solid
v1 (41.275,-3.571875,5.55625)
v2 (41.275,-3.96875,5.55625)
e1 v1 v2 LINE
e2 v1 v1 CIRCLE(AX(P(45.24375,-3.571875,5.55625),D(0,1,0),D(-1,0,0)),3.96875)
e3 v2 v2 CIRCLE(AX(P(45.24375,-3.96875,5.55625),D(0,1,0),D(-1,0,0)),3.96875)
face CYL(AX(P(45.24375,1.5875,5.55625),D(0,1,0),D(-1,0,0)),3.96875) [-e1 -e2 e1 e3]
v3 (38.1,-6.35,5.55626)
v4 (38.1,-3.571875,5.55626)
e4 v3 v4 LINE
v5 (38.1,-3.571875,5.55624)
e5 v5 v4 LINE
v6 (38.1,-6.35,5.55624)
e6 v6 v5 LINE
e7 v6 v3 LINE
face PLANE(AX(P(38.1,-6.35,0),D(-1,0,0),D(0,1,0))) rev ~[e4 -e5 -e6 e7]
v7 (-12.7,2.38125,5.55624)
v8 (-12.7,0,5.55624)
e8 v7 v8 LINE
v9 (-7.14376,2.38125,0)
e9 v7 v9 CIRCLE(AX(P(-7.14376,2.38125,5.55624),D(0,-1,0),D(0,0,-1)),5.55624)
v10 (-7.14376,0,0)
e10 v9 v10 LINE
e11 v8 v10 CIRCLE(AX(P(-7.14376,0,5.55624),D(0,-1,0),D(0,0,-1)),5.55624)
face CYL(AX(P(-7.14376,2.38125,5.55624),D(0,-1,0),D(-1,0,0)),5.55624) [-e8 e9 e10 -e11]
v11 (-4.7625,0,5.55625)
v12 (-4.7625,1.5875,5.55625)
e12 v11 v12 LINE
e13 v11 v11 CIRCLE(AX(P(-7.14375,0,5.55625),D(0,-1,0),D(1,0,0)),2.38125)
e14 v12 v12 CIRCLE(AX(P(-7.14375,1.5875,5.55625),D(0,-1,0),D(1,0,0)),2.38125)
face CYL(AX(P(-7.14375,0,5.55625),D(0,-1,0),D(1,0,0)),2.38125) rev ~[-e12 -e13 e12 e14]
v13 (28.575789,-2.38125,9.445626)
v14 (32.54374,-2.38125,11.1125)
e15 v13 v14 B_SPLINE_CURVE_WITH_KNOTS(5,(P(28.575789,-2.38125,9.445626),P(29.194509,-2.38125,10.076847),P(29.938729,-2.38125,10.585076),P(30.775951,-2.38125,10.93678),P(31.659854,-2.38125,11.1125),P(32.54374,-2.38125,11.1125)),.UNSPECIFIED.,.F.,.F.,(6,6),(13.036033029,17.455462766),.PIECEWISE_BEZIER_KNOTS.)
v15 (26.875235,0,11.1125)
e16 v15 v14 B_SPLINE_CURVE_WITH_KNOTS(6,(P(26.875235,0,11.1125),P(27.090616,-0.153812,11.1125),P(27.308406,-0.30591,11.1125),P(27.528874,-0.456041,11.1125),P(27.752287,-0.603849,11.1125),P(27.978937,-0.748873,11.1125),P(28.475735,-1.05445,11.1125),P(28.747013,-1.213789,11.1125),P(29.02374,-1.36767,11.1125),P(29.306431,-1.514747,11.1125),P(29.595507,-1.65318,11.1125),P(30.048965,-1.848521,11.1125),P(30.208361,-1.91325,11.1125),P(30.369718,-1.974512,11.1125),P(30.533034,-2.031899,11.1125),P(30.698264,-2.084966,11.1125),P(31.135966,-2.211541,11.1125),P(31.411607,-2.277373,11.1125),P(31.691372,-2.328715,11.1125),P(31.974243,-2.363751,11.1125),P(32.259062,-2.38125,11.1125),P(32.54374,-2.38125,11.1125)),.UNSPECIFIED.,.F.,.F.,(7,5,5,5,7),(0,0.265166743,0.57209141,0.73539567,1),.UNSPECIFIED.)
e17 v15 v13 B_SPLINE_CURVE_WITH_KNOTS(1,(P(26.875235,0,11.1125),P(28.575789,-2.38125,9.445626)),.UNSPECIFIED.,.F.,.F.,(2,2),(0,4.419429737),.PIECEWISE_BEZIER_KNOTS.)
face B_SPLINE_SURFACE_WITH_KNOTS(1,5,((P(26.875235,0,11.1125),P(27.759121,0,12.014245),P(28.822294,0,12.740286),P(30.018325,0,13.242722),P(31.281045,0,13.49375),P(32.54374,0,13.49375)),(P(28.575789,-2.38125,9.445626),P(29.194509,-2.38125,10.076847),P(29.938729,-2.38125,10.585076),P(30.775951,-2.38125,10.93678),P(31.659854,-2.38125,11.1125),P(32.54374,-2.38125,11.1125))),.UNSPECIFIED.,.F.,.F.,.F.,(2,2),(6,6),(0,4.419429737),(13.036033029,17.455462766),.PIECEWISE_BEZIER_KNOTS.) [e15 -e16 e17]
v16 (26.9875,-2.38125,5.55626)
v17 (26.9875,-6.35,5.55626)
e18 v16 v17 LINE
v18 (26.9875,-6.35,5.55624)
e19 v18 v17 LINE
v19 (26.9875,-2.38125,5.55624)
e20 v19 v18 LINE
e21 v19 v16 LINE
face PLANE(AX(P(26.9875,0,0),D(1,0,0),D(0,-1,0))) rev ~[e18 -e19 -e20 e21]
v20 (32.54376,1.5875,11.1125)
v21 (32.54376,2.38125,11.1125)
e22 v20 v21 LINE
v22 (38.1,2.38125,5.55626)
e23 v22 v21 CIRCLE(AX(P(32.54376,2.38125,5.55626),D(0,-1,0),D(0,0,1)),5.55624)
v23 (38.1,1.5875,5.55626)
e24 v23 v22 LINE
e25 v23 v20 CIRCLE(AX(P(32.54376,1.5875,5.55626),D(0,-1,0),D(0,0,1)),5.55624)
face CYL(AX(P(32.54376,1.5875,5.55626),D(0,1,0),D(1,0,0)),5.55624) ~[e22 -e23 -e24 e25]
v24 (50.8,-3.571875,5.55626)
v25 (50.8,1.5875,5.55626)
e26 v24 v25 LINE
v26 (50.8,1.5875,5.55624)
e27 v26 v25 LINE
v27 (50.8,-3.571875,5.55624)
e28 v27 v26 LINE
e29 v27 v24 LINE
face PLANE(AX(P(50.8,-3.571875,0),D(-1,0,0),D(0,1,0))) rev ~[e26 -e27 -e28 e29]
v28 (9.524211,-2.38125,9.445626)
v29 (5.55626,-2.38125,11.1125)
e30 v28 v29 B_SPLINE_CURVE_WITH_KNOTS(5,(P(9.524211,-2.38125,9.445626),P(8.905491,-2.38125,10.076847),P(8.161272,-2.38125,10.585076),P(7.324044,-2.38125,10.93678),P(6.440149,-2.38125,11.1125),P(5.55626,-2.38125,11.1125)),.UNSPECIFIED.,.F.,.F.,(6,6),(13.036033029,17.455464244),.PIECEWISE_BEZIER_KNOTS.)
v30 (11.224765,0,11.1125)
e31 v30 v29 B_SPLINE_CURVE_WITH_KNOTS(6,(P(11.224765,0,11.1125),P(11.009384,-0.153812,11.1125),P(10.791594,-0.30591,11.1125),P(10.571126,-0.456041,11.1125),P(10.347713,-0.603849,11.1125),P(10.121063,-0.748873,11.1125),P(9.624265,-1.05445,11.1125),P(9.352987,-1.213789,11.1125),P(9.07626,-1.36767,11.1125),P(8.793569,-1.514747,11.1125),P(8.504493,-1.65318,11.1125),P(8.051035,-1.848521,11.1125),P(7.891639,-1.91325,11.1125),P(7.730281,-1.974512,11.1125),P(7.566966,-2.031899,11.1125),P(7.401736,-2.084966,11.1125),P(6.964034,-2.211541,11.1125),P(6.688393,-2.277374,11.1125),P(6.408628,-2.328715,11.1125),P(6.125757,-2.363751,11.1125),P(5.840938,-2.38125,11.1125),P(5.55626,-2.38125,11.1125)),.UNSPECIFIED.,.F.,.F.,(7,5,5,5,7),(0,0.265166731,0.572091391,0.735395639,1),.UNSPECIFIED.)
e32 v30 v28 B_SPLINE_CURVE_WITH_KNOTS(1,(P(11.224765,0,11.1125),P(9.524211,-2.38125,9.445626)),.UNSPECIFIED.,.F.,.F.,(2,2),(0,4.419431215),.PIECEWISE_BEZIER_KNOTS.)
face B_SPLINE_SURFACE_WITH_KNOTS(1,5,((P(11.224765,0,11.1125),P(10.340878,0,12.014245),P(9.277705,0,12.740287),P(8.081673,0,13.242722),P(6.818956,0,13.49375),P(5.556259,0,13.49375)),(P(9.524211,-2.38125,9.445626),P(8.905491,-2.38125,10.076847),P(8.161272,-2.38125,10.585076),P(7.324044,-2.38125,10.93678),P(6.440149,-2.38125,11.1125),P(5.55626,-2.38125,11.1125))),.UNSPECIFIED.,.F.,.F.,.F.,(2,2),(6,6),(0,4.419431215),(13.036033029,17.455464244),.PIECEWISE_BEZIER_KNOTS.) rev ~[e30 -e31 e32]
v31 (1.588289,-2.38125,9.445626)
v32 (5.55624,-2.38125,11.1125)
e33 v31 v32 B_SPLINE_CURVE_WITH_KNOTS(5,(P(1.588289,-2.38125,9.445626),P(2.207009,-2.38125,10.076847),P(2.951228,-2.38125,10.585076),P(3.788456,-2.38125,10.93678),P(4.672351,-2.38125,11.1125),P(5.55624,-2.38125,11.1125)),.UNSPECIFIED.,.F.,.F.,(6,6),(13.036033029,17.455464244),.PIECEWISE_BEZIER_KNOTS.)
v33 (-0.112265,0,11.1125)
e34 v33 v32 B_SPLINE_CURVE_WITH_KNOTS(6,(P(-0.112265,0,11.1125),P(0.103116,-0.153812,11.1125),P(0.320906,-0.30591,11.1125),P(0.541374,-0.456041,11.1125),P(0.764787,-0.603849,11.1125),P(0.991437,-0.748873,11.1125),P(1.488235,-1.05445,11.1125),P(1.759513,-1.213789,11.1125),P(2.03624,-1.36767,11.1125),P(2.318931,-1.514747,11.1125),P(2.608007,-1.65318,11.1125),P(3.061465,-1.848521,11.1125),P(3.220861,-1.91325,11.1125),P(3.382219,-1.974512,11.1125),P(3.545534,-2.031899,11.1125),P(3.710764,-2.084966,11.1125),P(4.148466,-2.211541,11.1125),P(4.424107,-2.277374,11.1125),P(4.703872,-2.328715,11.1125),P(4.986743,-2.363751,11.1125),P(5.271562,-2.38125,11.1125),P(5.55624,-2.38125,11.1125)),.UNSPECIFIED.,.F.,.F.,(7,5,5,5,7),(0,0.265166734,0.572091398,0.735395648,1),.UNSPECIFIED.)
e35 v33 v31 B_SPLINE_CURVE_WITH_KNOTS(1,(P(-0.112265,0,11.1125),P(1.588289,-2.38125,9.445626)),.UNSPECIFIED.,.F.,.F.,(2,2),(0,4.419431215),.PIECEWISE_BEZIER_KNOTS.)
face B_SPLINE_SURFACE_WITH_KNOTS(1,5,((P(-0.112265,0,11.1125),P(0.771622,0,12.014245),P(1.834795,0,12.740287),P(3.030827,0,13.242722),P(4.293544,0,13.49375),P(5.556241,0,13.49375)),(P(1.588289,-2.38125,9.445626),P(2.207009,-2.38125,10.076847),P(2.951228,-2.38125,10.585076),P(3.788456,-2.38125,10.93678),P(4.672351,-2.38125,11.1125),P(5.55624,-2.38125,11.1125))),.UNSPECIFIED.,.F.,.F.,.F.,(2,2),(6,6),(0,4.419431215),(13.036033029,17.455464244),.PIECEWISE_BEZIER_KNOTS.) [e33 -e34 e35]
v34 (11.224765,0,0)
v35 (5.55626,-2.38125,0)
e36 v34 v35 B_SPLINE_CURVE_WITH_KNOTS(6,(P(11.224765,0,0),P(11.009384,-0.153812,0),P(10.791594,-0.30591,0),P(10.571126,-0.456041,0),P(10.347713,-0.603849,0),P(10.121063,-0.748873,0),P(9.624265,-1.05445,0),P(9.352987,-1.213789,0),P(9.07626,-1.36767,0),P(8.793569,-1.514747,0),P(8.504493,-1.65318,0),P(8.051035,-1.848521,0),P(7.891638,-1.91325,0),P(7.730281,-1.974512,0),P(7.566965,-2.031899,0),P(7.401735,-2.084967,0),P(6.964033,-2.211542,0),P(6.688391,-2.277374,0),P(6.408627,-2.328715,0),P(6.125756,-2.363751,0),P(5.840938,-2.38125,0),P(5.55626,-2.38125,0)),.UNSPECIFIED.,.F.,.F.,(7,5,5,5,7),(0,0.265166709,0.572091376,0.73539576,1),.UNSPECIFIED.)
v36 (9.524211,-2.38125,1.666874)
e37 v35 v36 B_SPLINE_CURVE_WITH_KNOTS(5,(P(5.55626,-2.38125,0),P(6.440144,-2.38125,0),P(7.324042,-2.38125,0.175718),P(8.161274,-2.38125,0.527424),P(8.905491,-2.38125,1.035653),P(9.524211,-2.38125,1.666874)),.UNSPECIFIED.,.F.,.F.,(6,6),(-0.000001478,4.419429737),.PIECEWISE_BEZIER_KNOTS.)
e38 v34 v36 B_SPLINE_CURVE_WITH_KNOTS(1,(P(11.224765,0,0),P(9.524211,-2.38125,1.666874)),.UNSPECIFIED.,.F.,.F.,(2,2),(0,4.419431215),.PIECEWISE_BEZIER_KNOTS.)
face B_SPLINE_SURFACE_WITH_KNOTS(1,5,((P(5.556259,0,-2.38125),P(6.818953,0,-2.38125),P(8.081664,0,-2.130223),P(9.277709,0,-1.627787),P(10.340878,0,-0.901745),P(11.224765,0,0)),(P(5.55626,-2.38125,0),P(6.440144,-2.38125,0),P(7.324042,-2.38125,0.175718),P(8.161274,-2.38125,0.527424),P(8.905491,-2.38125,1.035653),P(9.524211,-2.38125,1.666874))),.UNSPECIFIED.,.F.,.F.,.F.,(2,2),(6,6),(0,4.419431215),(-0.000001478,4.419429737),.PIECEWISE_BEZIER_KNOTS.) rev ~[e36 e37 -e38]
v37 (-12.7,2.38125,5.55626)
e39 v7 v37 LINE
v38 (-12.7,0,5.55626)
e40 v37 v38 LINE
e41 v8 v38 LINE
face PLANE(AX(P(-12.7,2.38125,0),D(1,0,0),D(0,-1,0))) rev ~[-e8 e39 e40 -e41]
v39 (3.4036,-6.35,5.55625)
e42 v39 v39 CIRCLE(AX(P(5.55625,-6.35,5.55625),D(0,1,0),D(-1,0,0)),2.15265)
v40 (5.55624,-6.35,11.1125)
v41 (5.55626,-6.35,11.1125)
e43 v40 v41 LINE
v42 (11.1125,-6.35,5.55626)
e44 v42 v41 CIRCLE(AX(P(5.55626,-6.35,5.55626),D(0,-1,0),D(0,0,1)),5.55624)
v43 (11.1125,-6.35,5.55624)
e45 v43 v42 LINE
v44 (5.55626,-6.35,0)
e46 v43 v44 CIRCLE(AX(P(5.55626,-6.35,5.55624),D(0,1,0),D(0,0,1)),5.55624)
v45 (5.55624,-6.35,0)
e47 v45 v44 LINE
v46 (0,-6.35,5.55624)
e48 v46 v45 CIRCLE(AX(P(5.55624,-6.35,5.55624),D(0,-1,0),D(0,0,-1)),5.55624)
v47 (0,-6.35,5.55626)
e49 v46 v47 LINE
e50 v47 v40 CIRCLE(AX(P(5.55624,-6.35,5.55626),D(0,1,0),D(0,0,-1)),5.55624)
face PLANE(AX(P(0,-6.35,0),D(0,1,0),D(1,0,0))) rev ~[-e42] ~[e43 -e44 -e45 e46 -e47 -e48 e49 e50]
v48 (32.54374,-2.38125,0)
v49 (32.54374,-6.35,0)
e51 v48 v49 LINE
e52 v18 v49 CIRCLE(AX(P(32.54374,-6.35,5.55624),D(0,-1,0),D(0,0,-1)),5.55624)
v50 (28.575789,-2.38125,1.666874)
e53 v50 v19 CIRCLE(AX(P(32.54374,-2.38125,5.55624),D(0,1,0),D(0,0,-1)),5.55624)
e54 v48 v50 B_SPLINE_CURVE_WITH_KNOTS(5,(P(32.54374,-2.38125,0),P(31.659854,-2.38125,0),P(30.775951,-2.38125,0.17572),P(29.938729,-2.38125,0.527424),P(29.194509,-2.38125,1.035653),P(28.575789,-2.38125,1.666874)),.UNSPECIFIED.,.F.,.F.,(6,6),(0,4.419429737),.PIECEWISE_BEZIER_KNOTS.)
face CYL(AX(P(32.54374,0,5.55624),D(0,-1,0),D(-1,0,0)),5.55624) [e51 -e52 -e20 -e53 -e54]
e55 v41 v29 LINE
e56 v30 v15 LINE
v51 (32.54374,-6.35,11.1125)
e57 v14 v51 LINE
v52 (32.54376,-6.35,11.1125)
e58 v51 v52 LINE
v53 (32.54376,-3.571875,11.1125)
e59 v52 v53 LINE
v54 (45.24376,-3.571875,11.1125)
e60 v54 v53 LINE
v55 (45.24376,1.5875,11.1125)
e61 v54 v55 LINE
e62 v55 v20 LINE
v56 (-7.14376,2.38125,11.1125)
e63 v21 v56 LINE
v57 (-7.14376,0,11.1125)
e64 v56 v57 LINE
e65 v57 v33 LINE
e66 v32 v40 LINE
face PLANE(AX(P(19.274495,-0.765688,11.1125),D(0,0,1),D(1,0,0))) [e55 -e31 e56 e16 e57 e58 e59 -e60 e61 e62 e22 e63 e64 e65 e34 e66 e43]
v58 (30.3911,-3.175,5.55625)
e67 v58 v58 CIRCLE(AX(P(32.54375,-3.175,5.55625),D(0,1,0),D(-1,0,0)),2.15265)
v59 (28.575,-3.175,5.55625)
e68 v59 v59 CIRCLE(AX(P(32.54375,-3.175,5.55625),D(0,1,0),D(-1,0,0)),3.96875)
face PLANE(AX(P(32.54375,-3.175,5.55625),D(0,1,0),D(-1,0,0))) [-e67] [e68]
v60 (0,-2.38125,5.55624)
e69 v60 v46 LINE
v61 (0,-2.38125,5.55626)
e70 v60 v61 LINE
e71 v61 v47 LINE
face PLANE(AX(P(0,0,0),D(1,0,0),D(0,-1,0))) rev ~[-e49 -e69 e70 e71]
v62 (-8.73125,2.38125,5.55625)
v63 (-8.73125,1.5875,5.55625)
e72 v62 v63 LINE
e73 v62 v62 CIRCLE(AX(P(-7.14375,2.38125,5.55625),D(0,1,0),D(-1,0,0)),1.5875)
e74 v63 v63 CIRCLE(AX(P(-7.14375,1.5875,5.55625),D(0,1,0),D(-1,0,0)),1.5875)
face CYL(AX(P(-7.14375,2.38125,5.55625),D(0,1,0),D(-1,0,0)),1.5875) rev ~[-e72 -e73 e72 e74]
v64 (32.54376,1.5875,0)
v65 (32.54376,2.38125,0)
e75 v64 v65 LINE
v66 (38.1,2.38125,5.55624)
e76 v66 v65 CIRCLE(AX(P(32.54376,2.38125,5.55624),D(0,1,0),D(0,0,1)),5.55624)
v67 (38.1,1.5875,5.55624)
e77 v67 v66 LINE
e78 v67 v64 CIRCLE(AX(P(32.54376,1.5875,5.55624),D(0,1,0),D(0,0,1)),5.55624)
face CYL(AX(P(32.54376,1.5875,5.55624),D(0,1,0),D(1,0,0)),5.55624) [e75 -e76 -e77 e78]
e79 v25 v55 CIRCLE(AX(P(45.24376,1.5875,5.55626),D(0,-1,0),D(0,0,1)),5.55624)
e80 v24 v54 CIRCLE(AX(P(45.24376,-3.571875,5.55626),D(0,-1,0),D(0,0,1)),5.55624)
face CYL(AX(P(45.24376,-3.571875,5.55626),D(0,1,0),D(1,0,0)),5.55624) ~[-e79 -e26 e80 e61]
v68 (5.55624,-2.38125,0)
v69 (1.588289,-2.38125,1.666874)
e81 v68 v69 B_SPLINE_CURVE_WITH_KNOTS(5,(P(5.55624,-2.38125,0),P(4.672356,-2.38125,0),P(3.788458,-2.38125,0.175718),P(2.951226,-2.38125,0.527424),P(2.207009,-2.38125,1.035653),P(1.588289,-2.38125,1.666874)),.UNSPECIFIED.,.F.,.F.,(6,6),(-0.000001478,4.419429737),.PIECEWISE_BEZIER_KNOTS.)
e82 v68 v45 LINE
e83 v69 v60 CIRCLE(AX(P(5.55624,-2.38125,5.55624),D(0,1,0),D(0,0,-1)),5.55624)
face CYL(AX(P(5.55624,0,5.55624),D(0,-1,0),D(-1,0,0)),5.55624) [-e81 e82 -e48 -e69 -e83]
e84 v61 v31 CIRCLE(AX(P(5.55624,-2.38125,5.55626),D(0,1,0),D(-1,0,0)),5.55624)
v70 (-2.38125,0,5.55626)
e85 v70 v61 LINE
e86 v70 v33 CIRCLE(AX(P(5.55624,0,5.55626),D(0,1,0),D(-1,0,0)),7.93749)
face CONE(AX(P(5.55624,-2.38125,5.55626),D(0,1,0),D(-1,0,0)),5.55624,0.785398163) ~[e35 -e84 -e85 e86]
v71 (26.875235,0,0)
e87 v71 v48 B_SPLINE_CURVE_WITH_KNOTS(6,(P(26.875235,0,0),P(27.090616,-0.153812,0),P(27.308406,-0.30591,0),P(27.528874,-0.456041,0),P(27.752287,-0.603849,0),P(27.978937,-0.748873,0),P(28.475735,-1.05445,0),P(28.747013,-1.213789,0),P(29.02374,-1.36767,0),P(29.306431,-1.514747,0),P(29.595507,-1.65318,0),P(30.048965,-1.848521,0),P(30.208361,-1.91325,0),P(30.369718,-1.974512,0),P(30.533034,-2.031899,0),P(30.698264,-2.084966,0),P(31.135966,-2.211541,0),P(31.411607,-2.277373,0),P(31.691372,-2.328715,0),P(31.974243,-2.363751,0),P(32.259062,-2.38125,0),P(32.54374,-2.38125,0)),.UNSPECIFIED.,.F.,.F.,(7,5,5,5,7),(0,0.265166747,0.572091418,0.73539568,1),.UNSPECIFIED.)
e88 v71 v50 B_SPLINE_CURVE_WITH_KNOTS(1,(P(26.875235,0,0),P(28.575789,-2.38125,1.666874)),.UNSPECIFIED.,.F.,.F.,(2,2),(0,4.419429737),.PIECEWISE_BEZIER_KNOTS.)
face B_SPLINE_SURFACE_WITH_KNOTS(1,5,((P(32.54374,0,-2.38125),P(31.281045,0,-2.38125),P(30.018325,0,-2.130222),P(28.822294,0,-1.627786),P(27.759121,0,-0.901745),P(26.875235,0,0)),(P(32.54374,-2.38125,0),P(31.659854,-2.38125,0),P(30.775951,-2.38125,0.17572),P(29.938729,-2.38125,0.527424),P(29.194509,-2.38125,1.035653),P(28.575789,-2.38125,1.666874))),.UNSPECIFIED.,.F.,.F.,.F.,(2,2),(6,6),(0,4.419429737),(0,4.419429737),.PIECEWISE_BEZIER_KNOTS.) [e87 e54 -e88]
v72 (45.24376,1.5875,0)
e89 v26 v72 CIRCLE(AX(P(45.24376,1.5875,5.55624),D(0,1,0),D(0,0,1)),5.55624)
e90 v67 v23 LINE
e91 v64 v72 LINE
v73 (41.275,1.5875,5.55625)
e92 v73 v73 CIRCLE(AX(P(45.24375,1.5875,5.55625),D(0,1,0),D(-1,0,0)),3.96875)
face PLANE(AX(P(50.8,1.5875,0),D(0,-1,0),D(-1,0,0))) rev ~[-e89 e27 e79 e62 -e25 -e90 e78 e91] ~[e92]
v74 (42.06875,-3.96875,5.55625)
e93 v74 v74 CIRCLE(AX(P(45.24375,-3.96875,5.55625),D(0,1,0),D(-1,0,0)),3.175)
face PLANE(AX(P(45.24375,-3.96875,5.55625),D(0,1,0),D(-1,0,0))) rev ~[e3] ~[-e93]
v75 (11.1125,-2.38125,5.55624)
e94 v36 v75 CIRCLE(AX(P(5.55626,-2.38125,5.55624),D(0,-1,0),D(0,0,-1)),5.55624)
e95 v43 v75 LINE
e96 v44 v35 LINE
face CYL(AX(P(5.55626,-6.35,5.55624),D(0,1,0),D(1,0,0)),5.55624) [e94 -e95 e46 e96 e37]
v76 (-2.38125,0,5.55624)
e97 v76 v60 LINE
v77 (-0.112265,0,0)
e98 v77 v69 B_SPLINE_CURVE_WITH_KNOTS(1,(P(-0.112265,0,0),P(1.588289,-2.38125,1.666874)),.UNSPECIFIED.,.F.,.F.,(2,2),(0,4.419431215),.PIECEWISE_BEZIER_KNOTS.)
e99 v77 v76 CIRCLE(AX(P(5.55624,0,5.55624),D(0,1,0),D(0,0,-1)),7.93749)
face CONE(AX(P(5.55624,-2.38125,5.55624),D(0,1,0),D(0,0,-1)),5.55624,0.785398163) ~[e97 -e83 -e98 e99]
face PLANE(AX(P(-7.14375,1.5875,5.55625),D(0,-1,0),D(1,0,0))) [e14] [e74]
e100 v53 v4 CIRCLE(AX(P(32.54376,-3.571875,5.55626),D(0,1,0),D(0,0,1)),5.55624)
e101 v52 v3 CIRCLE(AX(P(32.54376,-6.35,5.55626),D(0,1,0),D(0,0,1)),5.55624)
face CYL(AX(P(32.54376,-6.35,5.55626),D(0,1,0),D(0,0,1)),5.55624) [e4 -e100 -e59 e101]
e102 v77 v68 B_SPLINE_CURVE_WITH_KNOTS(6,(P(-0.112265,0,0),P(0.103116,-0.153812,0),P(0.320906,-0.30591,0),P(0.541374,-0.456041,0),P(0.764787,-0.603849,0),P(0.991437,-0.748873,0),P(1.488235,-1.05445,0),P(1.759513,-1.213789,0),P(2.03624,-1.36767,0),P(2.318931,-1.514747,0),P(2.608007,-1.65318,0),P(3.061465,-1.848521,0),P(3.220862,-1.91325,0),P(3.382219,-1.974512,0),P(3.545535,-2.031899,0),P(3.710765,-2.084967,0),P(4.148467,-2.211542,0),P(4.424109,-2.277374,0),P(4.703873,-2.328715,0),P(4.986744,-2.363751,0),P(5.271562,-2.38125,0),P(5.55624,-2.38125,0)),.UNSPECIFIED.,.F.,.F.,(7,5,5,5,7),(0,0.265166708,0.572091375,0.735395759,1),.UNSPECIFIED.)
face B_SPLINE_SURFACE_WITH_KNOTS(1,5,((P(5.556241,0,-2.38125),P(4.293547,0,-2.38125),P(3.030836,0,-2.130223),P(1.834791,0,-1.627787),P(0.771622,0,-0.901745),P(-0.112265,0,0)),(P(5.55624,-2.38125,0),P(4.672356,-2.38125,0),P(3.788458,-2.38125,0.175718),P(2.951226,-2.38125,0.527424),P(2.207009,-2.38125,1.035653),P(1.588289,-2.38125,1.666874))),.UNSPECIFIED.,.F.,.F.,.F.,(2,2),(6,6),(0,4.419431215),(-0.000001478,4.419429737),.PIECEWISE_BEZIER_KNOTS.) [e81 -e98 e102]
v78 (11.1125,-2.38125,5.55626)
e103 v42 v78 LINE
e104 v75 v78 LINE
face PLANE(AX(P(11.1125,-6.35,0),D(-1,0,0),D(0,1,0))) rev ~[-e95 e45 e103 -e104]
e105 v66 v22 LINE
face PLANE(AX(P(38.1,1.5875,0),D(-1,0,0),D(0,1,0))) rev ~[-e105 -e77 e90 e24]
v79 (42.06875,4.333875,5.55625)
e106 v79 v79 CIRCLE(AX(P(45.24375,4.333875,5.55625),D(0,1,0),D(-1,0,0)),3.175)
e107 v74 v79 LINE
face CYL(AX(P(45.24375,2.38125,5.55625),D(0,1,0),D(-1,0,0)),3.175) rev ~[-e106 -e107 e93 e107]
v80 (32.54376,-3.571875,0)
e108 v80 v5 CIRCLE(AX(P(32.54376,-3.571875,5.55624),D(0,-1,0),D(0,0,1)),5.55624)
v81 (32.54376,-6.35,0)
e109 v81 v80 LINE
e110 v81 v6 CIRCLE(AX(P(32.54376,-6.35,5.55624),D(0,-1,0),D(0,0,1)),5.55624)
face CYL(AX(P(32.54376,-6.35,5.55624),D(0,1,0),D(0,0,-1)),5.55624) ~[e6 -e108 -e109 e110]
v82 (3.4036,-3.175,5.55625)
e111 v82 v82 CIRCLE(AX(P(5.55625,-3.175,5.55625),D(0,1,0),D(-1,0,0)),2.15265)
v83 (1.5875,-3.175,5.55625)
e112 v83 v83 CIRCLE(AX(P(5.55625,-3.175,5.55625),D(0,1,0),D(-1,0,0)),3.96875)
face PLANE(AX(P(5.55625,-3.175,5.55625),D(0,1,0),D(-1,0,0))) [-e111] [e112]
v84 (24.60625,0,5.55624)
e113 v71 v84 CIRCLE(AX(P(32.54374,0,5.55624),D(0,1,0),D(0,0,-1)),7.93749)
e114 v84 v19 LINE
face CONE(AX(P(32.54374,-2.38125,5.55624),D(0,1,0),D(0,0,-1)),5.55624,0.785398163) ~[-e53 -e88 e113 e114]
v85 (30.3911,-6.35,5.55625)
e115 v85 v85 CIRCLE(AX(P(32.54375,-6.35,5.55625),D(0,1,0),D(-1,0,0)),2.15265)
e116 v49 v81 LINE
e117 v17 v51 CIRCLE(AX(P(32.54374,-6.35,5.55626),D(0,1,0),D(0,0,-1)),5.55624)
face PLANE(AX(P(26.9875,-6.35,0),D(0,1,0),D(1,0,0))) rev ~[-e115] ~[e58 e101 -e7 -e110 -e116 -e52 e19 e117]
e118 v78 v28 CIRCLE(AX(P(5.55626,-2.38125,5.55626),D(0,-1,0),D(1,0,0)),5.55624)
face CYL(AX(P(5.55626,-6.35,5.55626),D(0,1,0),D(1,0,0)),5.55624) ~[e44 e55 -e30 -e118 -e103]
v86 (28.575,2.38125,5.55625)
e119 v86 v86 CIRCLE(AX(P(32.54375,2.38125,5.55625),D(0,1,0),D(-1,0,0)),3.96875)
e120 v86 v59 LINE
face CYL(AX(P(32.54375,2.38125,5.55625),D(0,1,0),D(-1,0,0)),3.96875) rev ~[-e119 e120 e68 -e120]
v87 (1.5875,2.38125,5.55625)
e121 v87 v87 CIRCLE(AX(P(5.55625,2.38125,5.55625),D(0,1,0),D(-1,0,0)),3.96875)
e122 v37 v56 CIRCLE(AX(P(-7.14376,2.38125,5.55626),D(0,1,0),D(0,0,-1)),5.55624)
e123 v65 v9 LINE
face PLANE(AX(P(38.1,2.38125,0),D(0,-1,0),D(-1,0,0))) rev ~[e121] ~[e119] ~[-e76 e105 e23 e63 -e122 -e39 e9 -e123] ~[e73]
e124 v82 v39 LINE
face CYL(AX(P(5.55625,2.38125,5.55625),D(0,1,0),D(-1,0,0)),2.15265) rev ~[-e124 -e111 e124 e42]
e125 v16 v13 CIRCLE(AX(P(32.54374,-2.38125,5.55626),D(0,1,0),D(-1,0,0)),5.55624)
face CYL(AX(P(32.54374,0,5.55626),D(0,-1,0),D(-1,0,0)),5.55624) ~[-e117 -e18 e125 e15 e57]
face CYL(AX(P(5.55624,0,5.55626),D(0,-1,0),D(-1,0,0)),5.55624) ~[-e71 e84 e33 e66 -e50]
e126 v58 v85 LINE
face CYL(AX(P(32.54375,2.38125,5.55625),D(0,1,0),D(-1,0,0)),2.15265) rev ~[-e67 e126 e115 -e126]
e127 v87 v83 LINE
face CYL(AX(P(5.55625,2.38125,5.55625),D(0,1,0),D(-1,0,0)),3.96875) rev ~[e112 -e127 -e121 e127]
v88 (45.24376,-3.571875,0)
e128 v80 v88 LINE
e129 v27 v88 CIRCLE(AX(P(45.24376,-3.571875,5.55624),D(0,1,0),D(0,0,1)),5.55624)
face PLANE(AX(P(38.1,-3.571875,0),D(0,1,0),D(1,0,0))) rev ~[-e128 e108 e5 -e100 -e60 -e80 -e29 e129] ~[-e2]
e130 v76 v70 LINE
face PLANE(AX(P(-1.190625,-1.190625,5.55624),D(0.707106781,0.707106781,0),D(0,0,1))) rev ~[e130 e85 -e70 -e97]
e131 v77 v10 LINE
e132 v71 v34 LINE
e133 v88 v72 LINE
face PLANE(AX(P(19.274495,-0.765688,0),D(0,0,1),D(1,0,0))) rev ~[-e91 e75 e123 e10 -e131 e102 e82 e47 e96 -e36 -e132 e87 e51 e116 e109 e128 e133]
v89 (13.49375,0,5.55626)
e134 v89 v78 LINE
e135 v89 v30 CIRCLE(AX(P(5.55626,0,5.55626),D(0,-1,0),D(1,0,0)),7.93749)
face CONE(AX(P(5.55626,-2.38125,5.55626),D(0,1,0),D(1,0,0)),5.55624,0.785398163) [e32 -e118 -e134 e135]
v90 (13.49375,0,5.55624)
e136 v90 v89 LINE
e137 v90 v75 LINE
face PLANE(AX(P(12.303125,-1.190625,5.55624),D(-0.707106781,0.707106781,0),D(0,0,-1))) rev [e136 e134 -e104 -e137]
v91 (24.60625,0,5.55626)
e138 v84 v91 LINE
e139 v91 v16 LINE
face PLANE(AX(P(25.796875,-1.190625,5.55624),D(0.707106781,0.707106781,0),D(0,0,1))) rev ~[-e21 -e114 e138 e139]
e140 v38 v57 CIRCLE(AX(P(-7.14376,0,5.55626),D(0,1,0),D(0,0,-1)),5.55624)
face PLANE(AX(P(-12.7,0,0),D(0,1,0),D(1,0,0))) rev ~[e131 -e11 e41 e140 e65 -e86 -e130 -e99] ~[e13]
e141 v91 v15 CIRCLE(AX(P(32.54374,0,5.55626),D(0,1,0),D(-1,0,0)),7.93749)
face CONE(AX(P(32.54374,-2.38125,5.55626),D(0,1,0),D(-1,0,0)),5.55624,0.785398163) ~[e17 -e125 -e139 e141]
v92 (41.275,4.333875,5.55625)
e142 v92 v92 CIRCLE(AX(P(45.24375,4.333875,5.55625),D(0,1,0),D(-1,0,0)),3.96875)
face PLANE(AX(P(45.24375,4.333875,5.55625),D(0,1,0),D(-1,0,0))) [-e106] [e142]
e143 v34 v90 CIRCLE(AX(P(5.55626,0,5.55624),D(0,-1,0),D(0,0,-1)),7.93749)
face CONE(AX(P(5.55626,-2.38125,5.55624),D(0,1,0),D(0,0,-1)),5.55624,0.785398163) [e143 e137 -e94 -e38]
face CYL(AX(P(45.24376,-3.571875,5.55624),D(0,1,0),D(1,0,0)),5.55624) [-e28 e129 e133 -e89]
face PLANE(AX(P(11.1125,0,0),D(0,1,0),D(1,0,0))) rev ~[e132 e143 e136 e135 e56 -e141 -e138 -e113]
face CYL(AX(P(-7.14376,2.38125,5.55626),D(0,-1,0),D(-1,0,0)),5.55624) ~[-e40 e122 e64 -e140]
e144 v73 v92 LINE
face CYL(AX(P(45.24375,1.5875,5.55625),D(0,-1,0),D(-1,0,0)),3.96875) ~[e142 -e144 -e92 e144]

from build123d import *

# Parameters (mm, degrees)
F1_DEPTH      = 11.1125
F2_R          = 3.175
F2_R_2        = 1.5875
F2_R_3        = 2.15265
F3_DEPTH      = 8.73125
F4_R          = 2.38125
F5_DEPTH      = 1.5875
F6_R          = 3.96875
F6_R_2        = 3.175
F7_DEPTH      = 2.746375
F7_DEPTH_BACK = 5.55625
F8_R          = 5.55624
F10_R         = 3.96875
F11_DEPTH     = 5.55625
F12_C1_SIZE   = 2.38125
F12_C2_SIZE   = 2.38125
F12_C3_SIZE   = 2.38125


# Not quite as in the source:
# - a fillet or chamfer is up to 0.001 mm smaller than in the source, because OpenCascade refuses the exact size


with BuildPart() as f1:
    # F0 (on Top) → F1 (new body)
    with BuildSketch(Plane.XY):
        Polygon((-12.7, 0), (0, 0), (0, -6.35), (11.1125, -6.35), (11.1125, 0), (26.9875, 0), (26.9875, -6.35), (38.1, -6.35), (38.1, -3.571875), (50.8, -3.571875), (50.8, 1.5875), (38.1, 1.5875), (38.1, 2.38125), (-12.7, 2.38125), align=None)
    extrude(amount=F1_DEPTH)

    # F2 (on face) → F3 (cut, through all)
    with BuildSketch(Plane(origin=(0, 2.38125, 0), x_dir=(-1, 0, 0), z_dir=(0, 1, 0))):
        with Locations((-45.24375, 5.55625)):
            Circle(F2_R)
        with Locations((7.14375, 5.55625)):
            Circle(F2_R_2)
        with Locations((-5.55625, 5.55625)):
            Circle(F2_R_3)
        with Locations((-32.54375, 5.55625)):
            Circle(F2_R_3)
    extrude(amount=-F3_DEPTH, mode=Mode.SUBTRACT)

    # F4 (on face) → F5 (cut)
    with BuildSketch(Plane.XZ):
        with Locations((-7.14375, 5.55625)):
            Circle(F4_R)
    extrude(amount=-F5_DEPTH, mode=Mode.SUBTRACT)

    # F6 (on face) → F7 (join, two sides)
    with BuildSketch(Plane(origin=(0, 1.5875, 0), x_dir=(-1, 0, 0), z_dir=(0, 1, 0))) as f7_sk:
        with Locations((-45.24375, 5.55625)):
            Circle(F6_R)
        with Locations((-45.24375, 5.55625)):
            Circle(F6_R_2, mode=Mode.SUBTRACT)
    extrude(amount=F7_DEPTH)
    extrude(f7_sk.sketch, amount=-F7_DEPTH_BACK)

    # F8 (radius 5.55625 in the source; OpenCascade refuses exactly that, so slightly less here)
    f8_edges = [f1.edges().sort_by_distance(p)[0] for p in [
        (0, -3.175, 0),
        (0, -3.175, 11.1125),
        (38.1, -4.960938, 0),
        (38.1, -4.960938, 11.1125),
        (38.1, 1.984375, 0),
        (38.1, 1.984375, 11.1125),
        (11.1125, -3.175, 11.1125),
        (11.1125, -3.175, 0),
        (26.9875, -3.175, 11.1125),
        (26.9875, -3.175, 0),
        (50.8, -0.992188, 11.1125),
        (50.8, -0.992188, 0),
        (-12.7, 1.190625, 11.1125),
        (-12.7, 1.190625, 0),
    ]]
    fillet(f8_edges, radius=F8_R)

    # F10 (on face) → F11 (cut, through all)
    with BuildSketch(Plane(origin=(0, 2.38125, 0), x_dir=(-1, 0, 0), z_dir=(0, 1, 0))):
        with Locations((-32.54375, 5.55625)):
            Circle(F10_R)
        with Locations((-5.55625, 5.55625)):
            Circle(F10_R)
    extrude(amount=-F11_DEPTH, mode=Mode.SUBTRACT)

    # F12: chamfer of 2.38125 on 5 edges, made by hand

    # F12_c1
    f12_c1_edges = [f1.edges().sort_by_distance(p)[0] for p in [
        (1.6273850181, 0, 9.4851149819),
        (0, 0, 5.55625),
        (1.6273850181, 0, 1.6273850181),
    ]]
    chamfer(f12_c1_edges, length=F12_C1_SIZE)

    # F12_c2
    f12_c2_edges = [f1.edges().sort_by_distance(p)[0] for p in [
        (28.6148850181, 0, 9.4851149819),
        (26.9875, 0, 5.55625),
        (28.6148850181, 0, 1.6273850181),
    ]]
    chamfer(f12_c2_edges, length=F12_C2_SIZE)

    # F12_c3
    f12_c3_edges = [f1.edges().sort_by_distance(p)[0] for p in [
        (11.1125, 0, 5.55625),
        (9.4851149819, 0, 9.4851149819),
        (9.4851149819, 0, 1.6273850181),
    ]]
    chamfer(f12_c3_edges, length=F12_C3_SIZE)


solid = f1.part
